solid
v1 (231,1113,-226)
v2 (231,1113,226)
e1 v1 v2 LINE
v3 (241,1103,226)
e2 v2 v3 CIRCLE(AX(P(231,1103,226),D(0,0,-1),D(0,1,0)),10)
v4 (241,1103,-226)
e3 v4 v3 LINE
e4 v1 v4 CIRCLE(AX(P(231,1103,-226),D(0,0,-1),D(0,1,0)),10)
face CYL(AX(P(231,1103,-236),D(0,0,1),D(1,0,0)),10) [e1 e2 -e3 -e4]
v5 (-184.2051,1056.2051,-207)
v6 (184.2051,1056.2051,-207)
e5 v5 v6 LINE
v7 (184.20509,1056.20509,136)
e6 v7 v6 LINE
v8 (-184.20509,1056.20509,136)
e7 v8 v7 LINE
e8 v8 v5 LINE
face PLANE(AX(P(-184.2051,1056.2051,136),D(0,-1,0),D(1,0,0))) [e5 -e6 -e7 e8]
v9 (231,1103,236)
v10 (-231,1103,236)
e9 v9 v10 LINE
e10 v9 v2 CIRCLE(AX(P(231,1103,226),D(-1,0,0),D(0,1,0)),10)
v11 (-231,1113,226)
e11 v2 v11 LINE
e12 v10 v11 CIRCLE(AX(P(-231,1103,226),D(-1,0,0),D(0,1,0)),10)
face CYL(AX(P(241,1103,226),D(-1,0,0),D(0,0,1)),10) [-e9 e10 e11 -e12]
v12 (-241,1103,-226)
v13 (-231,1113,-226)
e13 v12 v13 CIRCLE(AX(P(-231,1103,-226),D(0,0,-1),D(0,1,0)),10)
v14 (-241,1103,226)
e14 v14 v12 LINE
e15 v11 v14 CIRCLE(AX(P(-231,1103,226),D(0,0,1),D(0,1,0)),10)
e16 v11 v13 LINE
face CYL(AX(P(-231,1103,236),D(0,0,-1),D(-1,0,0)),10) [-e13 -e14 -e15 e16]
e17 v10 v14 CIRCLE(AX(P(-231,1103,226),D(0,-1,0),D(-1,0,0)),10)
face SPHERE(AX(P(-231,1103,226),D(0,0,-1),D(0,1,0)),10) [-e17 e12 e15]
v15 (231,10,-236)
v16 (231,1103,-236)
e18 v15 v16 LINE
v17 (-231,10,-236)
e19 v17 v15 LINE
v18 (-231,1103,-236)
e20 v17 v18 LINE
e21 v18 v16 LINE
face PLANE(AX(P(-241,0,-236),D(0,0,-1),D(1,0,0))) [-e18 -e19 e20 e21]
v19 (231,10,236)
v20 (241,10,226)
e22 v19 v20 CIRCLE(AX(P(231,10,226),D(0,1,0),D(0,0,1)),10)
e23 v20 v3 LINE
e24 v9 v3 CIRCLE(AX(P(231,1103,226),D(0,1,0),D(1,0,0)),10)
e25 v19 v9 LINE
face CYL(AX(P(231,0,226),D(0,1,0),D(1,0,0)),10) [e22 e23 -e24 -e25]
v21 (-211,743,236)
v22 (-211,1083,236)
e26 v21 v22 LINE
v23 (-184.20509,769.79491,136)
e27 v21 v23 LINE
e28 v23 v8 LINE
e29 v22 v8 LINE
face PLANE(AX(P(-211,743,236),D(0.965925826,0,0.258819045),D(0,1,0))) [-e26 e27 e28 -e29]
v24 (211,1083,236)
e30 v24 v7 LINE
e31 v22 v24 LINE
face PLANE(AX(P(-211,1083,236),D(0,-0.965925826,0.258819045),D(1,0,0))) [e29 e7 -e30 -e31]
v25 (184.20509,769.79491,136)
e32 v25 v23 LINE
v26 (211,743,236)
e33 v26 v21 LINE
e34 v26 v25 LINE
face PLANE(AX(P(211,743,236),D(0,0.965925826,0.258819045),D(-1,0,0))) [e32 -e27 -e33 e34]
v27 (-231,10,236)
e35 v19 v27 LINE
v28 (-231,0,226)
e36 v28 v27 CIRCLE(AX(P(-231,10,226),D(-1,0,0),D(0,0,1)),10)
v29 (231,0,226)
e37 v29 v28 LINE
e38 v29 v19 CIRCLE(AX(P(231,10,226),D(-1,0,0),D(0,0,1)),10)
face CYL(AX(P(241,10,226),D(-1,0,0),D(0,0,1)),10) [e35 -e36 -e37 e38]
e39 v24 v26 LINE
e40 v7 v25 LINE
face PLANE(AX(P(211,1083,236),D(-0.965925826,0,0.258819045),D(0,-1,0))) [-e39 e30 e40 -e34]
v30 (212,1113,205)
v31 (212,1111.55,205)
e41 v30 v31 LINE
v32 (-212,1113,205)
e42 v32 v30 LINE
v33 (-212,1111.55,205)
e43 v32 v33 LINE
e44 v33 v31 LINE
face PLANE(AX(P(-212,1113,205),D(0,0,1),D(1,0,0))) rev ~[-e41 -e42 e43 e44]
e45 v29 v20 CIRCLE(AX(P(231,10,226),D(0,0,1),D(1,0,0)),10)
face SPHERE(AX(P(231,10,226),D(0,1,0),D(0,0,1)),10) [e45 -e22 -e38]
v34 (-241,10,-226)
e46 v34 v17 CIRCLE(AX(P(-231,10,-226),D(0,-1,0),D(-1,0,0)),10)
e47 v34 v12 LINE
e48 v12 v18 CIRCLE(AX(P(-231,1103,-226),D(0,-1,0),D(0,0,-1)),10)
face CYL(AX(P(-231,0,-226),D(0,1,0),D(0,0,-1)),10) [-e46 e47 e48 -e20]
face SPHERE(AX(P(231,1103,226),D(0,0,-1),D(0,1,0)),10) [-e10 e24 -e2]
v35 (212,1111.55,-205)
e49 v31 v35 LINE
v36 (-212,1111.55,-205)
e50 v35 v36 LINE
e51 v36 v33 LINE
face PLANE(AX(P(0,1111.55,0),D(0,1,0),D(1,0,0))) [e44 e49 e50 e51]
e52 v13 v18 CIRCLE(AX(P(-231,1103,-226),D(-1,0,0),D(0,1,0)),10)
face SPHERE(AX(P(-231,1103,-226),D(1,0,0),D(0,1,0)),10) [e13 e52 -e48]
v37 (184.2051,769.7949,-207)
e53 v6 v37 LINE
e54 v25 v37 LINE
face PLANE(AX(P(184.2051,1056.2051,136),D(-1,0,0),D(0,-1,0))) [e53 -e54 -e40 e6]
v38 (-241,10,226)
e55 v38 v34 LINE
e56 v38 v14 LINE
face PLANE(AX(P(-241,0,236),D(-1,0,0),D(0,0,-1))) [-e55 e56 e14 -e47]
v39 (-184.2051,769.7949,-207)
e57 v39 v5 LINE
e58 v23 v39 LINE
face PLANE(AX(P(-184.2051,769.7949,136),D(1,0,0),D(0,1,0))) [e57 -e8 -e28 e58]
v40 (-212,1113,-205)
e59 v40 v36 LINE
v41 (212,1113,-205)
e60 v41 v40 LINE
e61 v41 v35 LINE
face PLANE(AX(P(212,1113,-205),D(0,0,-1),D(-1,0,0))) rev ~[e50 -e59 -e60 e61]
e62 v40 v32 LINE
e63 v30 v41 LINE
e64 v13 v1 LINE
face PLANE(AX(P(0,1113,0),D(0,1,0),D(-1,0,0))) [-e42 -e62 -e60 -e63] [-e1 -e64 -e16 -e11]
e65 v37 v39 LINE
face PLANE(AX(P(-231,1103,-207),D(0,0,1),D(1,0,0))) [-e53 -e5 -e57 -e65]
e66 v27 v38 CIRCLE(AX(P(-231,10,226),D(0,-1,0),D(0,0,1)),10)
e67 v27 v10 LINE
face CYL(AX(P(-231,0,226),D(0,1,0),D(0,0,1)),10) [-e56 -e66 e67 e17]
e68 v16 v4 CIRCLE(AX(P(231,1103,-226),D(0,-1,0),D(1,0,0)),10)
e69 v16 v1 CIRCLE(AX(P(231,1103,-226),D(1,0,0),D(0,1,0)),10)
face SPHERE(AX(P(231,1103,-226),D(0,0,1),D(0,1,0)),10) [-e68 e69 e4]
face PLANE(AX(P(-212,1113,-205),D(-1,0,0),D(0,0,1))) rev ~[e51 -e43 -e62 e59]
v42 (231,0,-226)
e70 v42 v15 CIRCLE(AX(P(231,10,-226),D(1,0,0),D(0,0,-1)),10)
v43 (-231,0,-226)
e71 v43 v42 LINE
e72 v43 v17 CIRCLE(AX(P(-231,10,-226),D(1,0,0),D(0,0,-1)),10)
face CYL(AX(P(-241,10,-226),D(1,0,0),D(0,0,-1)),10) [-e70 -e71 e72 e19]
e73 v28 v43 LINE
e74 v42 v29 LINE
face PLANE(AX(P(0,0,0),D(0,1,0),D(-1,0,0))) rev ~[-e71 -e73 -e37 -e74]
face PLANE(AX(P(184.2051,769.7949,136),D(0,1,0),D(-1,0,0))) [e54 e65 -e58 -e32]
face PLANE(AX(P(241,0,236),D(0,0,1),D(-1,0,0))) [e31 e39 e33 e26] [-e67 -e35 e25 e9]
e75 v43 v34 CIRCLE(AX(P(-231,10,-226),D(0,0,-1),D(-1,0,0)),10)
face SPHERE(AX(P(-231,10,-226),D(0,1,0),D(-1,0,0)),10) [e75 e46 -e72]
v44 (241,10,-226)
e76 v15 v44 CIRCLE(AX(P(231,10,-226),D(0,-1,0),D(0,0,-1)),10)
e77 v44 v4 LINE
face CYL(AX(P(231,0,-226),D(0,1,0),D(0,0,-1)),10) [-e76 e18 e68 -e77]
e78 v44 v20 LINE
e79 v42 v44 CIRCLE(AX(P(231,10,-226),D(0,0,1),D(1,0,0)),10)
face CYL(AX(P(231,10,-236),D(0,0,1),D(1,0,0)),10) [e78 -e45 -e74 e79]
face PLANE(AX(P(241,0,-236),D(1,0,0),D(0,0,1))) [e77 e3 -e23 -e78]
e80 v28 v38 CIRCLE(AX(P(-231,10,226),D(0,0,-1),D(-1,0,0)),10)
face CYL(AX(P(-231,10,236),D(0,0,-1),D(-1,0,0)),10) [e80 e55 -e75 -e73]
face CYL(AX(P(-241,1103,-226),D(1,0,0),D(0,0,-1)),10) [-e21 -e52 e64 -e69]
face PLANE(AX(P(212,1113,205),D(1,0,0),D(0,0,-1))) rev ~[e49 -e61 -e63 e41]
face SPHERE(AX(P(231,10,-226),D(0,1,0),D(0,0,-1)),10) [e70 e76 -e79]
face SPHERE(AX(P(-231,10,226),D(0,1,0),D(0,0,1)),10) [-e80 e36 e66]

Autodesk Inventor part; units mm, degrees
ref_plane "YZ Plane" through (0, 0, 0) normal (1, 0, 0) x (0, 1, 0)
ref_plane "XZ Plane" through (0, 0, 0) normal (0, 1, 0) x (-1, 0, 0)
ref_plane "XY Plane" through (0, 0, 0) normal (0, 0, 1) x (1, 0, 0)
sketch "スケッチ1" plane through (0, 0, 0) normal (0, 1, 0) x (-1, 0, 0)
  line L0 (241, -236) -> (-241, -236)
  line L1 (-241, -236) -> (-241, 236)
  line L2 (-241, 236) -> (241, 236)
  line L3 (241, 236) -> (241, -236)
  line L4 (241, -236) -> (-241, 236) construction
  line L5 (-241, -236) -> (241, 236) construction
  point P0 (0, 0)
  dimension "d0" = 482
  dimension "d1" = 472
extrude "押し出し1" add sketch "スケッチ1" along normal blind 1113
fillet "フィレット1" radius 10 12 edges at (241, 1113, 0) (0, 1113, -236) (-241, 1113, 0) (0, 1113, 236) (-241, 556.5, 236) (241, 556.5, 236) (241, 556.5, -236) (-241, 556.5, -236) (0, 0, 236) (-241, 0, 0) (0, 0, -236) (241, 0, 0)
sketch "スケッチ2" plane through (0, 1113, 0) normal (0, 1, 0) x (1, 0, 0)
  line L0 (-212, -205) -> (212, -205)
  line L1 (212, -205) -> (212, 205)
  line L2 (212, 205) -> (-212, 205)
  line L3 (-212, 205) -> (-212, -205)
  line L4 (-212, -205) -> (212, 205) construction
  line L5 (212, -205) -> (-212, 205) construction
  point P0 (0, 0)
  dimension "d5" = 424
  dimension "d6" = 410
extrude "押し出し2" cut sketch "スケッチ2" against normal blind 1.45
sketch "スケッチ3" plane through (-231, 1103, 236) normal (0, 0, 1) x (1, 0, 0)
  line L0 (20, -20) -> (442, -20)
  line L1 (442, -20) -> (442, -360)
  line L2 (442, -360) -> (20, -360)
  line L3 (20, -360) -> (20, -20)
  point P0 (231, -1103)
  dimension "d9" = 422
  dimension "d10" = 340
extrude "押し出し3" cut sketch "スケッチ3" against normal blind 100
draft "面の勾配1" angle 15 pull direction (0, 0, 1) faces at (70.3333, 743, 202.6667) fixed edges at (0, 743, 236)
draft "面の勾配2" angle 15 pull direction (0, 0, 1) faces at (-211, 865.265, 202.6667) fixed edges at (-211, 913, 236)
draft "面の勾配3" angle 15 pull direction (0, 0, 1) faces at (-61.4017, 1083, 202.6667) fixed edges at (0, 1083, 236)
draft "面の勾配4" angle 15 pull direction (0, 0, 1) faces at (211, 865.265, 202.6667) fixed edges at (211, 913, 236)
sketch "スケッチ4" plane through (-231, 1103, 136) normal (0, 0, 1) x (1, 0, 0)
  line L0 (46.7949, -46.7949) -> (415.2051, -46.7949)
  line L1 (415.2051, -46.7949) -> (415.2051, -333.2051)
  line L2 (415.2051, -333.2051) -> (46.7949, -333.2051)
  line L3 (46.7949, -333.2051) -> (46.7949, -46.7949)
  point P0 (231, -1103)
extrude "押し出し4" cut sketch "スケッチ4" against normal blind 343
properties part number "box"
